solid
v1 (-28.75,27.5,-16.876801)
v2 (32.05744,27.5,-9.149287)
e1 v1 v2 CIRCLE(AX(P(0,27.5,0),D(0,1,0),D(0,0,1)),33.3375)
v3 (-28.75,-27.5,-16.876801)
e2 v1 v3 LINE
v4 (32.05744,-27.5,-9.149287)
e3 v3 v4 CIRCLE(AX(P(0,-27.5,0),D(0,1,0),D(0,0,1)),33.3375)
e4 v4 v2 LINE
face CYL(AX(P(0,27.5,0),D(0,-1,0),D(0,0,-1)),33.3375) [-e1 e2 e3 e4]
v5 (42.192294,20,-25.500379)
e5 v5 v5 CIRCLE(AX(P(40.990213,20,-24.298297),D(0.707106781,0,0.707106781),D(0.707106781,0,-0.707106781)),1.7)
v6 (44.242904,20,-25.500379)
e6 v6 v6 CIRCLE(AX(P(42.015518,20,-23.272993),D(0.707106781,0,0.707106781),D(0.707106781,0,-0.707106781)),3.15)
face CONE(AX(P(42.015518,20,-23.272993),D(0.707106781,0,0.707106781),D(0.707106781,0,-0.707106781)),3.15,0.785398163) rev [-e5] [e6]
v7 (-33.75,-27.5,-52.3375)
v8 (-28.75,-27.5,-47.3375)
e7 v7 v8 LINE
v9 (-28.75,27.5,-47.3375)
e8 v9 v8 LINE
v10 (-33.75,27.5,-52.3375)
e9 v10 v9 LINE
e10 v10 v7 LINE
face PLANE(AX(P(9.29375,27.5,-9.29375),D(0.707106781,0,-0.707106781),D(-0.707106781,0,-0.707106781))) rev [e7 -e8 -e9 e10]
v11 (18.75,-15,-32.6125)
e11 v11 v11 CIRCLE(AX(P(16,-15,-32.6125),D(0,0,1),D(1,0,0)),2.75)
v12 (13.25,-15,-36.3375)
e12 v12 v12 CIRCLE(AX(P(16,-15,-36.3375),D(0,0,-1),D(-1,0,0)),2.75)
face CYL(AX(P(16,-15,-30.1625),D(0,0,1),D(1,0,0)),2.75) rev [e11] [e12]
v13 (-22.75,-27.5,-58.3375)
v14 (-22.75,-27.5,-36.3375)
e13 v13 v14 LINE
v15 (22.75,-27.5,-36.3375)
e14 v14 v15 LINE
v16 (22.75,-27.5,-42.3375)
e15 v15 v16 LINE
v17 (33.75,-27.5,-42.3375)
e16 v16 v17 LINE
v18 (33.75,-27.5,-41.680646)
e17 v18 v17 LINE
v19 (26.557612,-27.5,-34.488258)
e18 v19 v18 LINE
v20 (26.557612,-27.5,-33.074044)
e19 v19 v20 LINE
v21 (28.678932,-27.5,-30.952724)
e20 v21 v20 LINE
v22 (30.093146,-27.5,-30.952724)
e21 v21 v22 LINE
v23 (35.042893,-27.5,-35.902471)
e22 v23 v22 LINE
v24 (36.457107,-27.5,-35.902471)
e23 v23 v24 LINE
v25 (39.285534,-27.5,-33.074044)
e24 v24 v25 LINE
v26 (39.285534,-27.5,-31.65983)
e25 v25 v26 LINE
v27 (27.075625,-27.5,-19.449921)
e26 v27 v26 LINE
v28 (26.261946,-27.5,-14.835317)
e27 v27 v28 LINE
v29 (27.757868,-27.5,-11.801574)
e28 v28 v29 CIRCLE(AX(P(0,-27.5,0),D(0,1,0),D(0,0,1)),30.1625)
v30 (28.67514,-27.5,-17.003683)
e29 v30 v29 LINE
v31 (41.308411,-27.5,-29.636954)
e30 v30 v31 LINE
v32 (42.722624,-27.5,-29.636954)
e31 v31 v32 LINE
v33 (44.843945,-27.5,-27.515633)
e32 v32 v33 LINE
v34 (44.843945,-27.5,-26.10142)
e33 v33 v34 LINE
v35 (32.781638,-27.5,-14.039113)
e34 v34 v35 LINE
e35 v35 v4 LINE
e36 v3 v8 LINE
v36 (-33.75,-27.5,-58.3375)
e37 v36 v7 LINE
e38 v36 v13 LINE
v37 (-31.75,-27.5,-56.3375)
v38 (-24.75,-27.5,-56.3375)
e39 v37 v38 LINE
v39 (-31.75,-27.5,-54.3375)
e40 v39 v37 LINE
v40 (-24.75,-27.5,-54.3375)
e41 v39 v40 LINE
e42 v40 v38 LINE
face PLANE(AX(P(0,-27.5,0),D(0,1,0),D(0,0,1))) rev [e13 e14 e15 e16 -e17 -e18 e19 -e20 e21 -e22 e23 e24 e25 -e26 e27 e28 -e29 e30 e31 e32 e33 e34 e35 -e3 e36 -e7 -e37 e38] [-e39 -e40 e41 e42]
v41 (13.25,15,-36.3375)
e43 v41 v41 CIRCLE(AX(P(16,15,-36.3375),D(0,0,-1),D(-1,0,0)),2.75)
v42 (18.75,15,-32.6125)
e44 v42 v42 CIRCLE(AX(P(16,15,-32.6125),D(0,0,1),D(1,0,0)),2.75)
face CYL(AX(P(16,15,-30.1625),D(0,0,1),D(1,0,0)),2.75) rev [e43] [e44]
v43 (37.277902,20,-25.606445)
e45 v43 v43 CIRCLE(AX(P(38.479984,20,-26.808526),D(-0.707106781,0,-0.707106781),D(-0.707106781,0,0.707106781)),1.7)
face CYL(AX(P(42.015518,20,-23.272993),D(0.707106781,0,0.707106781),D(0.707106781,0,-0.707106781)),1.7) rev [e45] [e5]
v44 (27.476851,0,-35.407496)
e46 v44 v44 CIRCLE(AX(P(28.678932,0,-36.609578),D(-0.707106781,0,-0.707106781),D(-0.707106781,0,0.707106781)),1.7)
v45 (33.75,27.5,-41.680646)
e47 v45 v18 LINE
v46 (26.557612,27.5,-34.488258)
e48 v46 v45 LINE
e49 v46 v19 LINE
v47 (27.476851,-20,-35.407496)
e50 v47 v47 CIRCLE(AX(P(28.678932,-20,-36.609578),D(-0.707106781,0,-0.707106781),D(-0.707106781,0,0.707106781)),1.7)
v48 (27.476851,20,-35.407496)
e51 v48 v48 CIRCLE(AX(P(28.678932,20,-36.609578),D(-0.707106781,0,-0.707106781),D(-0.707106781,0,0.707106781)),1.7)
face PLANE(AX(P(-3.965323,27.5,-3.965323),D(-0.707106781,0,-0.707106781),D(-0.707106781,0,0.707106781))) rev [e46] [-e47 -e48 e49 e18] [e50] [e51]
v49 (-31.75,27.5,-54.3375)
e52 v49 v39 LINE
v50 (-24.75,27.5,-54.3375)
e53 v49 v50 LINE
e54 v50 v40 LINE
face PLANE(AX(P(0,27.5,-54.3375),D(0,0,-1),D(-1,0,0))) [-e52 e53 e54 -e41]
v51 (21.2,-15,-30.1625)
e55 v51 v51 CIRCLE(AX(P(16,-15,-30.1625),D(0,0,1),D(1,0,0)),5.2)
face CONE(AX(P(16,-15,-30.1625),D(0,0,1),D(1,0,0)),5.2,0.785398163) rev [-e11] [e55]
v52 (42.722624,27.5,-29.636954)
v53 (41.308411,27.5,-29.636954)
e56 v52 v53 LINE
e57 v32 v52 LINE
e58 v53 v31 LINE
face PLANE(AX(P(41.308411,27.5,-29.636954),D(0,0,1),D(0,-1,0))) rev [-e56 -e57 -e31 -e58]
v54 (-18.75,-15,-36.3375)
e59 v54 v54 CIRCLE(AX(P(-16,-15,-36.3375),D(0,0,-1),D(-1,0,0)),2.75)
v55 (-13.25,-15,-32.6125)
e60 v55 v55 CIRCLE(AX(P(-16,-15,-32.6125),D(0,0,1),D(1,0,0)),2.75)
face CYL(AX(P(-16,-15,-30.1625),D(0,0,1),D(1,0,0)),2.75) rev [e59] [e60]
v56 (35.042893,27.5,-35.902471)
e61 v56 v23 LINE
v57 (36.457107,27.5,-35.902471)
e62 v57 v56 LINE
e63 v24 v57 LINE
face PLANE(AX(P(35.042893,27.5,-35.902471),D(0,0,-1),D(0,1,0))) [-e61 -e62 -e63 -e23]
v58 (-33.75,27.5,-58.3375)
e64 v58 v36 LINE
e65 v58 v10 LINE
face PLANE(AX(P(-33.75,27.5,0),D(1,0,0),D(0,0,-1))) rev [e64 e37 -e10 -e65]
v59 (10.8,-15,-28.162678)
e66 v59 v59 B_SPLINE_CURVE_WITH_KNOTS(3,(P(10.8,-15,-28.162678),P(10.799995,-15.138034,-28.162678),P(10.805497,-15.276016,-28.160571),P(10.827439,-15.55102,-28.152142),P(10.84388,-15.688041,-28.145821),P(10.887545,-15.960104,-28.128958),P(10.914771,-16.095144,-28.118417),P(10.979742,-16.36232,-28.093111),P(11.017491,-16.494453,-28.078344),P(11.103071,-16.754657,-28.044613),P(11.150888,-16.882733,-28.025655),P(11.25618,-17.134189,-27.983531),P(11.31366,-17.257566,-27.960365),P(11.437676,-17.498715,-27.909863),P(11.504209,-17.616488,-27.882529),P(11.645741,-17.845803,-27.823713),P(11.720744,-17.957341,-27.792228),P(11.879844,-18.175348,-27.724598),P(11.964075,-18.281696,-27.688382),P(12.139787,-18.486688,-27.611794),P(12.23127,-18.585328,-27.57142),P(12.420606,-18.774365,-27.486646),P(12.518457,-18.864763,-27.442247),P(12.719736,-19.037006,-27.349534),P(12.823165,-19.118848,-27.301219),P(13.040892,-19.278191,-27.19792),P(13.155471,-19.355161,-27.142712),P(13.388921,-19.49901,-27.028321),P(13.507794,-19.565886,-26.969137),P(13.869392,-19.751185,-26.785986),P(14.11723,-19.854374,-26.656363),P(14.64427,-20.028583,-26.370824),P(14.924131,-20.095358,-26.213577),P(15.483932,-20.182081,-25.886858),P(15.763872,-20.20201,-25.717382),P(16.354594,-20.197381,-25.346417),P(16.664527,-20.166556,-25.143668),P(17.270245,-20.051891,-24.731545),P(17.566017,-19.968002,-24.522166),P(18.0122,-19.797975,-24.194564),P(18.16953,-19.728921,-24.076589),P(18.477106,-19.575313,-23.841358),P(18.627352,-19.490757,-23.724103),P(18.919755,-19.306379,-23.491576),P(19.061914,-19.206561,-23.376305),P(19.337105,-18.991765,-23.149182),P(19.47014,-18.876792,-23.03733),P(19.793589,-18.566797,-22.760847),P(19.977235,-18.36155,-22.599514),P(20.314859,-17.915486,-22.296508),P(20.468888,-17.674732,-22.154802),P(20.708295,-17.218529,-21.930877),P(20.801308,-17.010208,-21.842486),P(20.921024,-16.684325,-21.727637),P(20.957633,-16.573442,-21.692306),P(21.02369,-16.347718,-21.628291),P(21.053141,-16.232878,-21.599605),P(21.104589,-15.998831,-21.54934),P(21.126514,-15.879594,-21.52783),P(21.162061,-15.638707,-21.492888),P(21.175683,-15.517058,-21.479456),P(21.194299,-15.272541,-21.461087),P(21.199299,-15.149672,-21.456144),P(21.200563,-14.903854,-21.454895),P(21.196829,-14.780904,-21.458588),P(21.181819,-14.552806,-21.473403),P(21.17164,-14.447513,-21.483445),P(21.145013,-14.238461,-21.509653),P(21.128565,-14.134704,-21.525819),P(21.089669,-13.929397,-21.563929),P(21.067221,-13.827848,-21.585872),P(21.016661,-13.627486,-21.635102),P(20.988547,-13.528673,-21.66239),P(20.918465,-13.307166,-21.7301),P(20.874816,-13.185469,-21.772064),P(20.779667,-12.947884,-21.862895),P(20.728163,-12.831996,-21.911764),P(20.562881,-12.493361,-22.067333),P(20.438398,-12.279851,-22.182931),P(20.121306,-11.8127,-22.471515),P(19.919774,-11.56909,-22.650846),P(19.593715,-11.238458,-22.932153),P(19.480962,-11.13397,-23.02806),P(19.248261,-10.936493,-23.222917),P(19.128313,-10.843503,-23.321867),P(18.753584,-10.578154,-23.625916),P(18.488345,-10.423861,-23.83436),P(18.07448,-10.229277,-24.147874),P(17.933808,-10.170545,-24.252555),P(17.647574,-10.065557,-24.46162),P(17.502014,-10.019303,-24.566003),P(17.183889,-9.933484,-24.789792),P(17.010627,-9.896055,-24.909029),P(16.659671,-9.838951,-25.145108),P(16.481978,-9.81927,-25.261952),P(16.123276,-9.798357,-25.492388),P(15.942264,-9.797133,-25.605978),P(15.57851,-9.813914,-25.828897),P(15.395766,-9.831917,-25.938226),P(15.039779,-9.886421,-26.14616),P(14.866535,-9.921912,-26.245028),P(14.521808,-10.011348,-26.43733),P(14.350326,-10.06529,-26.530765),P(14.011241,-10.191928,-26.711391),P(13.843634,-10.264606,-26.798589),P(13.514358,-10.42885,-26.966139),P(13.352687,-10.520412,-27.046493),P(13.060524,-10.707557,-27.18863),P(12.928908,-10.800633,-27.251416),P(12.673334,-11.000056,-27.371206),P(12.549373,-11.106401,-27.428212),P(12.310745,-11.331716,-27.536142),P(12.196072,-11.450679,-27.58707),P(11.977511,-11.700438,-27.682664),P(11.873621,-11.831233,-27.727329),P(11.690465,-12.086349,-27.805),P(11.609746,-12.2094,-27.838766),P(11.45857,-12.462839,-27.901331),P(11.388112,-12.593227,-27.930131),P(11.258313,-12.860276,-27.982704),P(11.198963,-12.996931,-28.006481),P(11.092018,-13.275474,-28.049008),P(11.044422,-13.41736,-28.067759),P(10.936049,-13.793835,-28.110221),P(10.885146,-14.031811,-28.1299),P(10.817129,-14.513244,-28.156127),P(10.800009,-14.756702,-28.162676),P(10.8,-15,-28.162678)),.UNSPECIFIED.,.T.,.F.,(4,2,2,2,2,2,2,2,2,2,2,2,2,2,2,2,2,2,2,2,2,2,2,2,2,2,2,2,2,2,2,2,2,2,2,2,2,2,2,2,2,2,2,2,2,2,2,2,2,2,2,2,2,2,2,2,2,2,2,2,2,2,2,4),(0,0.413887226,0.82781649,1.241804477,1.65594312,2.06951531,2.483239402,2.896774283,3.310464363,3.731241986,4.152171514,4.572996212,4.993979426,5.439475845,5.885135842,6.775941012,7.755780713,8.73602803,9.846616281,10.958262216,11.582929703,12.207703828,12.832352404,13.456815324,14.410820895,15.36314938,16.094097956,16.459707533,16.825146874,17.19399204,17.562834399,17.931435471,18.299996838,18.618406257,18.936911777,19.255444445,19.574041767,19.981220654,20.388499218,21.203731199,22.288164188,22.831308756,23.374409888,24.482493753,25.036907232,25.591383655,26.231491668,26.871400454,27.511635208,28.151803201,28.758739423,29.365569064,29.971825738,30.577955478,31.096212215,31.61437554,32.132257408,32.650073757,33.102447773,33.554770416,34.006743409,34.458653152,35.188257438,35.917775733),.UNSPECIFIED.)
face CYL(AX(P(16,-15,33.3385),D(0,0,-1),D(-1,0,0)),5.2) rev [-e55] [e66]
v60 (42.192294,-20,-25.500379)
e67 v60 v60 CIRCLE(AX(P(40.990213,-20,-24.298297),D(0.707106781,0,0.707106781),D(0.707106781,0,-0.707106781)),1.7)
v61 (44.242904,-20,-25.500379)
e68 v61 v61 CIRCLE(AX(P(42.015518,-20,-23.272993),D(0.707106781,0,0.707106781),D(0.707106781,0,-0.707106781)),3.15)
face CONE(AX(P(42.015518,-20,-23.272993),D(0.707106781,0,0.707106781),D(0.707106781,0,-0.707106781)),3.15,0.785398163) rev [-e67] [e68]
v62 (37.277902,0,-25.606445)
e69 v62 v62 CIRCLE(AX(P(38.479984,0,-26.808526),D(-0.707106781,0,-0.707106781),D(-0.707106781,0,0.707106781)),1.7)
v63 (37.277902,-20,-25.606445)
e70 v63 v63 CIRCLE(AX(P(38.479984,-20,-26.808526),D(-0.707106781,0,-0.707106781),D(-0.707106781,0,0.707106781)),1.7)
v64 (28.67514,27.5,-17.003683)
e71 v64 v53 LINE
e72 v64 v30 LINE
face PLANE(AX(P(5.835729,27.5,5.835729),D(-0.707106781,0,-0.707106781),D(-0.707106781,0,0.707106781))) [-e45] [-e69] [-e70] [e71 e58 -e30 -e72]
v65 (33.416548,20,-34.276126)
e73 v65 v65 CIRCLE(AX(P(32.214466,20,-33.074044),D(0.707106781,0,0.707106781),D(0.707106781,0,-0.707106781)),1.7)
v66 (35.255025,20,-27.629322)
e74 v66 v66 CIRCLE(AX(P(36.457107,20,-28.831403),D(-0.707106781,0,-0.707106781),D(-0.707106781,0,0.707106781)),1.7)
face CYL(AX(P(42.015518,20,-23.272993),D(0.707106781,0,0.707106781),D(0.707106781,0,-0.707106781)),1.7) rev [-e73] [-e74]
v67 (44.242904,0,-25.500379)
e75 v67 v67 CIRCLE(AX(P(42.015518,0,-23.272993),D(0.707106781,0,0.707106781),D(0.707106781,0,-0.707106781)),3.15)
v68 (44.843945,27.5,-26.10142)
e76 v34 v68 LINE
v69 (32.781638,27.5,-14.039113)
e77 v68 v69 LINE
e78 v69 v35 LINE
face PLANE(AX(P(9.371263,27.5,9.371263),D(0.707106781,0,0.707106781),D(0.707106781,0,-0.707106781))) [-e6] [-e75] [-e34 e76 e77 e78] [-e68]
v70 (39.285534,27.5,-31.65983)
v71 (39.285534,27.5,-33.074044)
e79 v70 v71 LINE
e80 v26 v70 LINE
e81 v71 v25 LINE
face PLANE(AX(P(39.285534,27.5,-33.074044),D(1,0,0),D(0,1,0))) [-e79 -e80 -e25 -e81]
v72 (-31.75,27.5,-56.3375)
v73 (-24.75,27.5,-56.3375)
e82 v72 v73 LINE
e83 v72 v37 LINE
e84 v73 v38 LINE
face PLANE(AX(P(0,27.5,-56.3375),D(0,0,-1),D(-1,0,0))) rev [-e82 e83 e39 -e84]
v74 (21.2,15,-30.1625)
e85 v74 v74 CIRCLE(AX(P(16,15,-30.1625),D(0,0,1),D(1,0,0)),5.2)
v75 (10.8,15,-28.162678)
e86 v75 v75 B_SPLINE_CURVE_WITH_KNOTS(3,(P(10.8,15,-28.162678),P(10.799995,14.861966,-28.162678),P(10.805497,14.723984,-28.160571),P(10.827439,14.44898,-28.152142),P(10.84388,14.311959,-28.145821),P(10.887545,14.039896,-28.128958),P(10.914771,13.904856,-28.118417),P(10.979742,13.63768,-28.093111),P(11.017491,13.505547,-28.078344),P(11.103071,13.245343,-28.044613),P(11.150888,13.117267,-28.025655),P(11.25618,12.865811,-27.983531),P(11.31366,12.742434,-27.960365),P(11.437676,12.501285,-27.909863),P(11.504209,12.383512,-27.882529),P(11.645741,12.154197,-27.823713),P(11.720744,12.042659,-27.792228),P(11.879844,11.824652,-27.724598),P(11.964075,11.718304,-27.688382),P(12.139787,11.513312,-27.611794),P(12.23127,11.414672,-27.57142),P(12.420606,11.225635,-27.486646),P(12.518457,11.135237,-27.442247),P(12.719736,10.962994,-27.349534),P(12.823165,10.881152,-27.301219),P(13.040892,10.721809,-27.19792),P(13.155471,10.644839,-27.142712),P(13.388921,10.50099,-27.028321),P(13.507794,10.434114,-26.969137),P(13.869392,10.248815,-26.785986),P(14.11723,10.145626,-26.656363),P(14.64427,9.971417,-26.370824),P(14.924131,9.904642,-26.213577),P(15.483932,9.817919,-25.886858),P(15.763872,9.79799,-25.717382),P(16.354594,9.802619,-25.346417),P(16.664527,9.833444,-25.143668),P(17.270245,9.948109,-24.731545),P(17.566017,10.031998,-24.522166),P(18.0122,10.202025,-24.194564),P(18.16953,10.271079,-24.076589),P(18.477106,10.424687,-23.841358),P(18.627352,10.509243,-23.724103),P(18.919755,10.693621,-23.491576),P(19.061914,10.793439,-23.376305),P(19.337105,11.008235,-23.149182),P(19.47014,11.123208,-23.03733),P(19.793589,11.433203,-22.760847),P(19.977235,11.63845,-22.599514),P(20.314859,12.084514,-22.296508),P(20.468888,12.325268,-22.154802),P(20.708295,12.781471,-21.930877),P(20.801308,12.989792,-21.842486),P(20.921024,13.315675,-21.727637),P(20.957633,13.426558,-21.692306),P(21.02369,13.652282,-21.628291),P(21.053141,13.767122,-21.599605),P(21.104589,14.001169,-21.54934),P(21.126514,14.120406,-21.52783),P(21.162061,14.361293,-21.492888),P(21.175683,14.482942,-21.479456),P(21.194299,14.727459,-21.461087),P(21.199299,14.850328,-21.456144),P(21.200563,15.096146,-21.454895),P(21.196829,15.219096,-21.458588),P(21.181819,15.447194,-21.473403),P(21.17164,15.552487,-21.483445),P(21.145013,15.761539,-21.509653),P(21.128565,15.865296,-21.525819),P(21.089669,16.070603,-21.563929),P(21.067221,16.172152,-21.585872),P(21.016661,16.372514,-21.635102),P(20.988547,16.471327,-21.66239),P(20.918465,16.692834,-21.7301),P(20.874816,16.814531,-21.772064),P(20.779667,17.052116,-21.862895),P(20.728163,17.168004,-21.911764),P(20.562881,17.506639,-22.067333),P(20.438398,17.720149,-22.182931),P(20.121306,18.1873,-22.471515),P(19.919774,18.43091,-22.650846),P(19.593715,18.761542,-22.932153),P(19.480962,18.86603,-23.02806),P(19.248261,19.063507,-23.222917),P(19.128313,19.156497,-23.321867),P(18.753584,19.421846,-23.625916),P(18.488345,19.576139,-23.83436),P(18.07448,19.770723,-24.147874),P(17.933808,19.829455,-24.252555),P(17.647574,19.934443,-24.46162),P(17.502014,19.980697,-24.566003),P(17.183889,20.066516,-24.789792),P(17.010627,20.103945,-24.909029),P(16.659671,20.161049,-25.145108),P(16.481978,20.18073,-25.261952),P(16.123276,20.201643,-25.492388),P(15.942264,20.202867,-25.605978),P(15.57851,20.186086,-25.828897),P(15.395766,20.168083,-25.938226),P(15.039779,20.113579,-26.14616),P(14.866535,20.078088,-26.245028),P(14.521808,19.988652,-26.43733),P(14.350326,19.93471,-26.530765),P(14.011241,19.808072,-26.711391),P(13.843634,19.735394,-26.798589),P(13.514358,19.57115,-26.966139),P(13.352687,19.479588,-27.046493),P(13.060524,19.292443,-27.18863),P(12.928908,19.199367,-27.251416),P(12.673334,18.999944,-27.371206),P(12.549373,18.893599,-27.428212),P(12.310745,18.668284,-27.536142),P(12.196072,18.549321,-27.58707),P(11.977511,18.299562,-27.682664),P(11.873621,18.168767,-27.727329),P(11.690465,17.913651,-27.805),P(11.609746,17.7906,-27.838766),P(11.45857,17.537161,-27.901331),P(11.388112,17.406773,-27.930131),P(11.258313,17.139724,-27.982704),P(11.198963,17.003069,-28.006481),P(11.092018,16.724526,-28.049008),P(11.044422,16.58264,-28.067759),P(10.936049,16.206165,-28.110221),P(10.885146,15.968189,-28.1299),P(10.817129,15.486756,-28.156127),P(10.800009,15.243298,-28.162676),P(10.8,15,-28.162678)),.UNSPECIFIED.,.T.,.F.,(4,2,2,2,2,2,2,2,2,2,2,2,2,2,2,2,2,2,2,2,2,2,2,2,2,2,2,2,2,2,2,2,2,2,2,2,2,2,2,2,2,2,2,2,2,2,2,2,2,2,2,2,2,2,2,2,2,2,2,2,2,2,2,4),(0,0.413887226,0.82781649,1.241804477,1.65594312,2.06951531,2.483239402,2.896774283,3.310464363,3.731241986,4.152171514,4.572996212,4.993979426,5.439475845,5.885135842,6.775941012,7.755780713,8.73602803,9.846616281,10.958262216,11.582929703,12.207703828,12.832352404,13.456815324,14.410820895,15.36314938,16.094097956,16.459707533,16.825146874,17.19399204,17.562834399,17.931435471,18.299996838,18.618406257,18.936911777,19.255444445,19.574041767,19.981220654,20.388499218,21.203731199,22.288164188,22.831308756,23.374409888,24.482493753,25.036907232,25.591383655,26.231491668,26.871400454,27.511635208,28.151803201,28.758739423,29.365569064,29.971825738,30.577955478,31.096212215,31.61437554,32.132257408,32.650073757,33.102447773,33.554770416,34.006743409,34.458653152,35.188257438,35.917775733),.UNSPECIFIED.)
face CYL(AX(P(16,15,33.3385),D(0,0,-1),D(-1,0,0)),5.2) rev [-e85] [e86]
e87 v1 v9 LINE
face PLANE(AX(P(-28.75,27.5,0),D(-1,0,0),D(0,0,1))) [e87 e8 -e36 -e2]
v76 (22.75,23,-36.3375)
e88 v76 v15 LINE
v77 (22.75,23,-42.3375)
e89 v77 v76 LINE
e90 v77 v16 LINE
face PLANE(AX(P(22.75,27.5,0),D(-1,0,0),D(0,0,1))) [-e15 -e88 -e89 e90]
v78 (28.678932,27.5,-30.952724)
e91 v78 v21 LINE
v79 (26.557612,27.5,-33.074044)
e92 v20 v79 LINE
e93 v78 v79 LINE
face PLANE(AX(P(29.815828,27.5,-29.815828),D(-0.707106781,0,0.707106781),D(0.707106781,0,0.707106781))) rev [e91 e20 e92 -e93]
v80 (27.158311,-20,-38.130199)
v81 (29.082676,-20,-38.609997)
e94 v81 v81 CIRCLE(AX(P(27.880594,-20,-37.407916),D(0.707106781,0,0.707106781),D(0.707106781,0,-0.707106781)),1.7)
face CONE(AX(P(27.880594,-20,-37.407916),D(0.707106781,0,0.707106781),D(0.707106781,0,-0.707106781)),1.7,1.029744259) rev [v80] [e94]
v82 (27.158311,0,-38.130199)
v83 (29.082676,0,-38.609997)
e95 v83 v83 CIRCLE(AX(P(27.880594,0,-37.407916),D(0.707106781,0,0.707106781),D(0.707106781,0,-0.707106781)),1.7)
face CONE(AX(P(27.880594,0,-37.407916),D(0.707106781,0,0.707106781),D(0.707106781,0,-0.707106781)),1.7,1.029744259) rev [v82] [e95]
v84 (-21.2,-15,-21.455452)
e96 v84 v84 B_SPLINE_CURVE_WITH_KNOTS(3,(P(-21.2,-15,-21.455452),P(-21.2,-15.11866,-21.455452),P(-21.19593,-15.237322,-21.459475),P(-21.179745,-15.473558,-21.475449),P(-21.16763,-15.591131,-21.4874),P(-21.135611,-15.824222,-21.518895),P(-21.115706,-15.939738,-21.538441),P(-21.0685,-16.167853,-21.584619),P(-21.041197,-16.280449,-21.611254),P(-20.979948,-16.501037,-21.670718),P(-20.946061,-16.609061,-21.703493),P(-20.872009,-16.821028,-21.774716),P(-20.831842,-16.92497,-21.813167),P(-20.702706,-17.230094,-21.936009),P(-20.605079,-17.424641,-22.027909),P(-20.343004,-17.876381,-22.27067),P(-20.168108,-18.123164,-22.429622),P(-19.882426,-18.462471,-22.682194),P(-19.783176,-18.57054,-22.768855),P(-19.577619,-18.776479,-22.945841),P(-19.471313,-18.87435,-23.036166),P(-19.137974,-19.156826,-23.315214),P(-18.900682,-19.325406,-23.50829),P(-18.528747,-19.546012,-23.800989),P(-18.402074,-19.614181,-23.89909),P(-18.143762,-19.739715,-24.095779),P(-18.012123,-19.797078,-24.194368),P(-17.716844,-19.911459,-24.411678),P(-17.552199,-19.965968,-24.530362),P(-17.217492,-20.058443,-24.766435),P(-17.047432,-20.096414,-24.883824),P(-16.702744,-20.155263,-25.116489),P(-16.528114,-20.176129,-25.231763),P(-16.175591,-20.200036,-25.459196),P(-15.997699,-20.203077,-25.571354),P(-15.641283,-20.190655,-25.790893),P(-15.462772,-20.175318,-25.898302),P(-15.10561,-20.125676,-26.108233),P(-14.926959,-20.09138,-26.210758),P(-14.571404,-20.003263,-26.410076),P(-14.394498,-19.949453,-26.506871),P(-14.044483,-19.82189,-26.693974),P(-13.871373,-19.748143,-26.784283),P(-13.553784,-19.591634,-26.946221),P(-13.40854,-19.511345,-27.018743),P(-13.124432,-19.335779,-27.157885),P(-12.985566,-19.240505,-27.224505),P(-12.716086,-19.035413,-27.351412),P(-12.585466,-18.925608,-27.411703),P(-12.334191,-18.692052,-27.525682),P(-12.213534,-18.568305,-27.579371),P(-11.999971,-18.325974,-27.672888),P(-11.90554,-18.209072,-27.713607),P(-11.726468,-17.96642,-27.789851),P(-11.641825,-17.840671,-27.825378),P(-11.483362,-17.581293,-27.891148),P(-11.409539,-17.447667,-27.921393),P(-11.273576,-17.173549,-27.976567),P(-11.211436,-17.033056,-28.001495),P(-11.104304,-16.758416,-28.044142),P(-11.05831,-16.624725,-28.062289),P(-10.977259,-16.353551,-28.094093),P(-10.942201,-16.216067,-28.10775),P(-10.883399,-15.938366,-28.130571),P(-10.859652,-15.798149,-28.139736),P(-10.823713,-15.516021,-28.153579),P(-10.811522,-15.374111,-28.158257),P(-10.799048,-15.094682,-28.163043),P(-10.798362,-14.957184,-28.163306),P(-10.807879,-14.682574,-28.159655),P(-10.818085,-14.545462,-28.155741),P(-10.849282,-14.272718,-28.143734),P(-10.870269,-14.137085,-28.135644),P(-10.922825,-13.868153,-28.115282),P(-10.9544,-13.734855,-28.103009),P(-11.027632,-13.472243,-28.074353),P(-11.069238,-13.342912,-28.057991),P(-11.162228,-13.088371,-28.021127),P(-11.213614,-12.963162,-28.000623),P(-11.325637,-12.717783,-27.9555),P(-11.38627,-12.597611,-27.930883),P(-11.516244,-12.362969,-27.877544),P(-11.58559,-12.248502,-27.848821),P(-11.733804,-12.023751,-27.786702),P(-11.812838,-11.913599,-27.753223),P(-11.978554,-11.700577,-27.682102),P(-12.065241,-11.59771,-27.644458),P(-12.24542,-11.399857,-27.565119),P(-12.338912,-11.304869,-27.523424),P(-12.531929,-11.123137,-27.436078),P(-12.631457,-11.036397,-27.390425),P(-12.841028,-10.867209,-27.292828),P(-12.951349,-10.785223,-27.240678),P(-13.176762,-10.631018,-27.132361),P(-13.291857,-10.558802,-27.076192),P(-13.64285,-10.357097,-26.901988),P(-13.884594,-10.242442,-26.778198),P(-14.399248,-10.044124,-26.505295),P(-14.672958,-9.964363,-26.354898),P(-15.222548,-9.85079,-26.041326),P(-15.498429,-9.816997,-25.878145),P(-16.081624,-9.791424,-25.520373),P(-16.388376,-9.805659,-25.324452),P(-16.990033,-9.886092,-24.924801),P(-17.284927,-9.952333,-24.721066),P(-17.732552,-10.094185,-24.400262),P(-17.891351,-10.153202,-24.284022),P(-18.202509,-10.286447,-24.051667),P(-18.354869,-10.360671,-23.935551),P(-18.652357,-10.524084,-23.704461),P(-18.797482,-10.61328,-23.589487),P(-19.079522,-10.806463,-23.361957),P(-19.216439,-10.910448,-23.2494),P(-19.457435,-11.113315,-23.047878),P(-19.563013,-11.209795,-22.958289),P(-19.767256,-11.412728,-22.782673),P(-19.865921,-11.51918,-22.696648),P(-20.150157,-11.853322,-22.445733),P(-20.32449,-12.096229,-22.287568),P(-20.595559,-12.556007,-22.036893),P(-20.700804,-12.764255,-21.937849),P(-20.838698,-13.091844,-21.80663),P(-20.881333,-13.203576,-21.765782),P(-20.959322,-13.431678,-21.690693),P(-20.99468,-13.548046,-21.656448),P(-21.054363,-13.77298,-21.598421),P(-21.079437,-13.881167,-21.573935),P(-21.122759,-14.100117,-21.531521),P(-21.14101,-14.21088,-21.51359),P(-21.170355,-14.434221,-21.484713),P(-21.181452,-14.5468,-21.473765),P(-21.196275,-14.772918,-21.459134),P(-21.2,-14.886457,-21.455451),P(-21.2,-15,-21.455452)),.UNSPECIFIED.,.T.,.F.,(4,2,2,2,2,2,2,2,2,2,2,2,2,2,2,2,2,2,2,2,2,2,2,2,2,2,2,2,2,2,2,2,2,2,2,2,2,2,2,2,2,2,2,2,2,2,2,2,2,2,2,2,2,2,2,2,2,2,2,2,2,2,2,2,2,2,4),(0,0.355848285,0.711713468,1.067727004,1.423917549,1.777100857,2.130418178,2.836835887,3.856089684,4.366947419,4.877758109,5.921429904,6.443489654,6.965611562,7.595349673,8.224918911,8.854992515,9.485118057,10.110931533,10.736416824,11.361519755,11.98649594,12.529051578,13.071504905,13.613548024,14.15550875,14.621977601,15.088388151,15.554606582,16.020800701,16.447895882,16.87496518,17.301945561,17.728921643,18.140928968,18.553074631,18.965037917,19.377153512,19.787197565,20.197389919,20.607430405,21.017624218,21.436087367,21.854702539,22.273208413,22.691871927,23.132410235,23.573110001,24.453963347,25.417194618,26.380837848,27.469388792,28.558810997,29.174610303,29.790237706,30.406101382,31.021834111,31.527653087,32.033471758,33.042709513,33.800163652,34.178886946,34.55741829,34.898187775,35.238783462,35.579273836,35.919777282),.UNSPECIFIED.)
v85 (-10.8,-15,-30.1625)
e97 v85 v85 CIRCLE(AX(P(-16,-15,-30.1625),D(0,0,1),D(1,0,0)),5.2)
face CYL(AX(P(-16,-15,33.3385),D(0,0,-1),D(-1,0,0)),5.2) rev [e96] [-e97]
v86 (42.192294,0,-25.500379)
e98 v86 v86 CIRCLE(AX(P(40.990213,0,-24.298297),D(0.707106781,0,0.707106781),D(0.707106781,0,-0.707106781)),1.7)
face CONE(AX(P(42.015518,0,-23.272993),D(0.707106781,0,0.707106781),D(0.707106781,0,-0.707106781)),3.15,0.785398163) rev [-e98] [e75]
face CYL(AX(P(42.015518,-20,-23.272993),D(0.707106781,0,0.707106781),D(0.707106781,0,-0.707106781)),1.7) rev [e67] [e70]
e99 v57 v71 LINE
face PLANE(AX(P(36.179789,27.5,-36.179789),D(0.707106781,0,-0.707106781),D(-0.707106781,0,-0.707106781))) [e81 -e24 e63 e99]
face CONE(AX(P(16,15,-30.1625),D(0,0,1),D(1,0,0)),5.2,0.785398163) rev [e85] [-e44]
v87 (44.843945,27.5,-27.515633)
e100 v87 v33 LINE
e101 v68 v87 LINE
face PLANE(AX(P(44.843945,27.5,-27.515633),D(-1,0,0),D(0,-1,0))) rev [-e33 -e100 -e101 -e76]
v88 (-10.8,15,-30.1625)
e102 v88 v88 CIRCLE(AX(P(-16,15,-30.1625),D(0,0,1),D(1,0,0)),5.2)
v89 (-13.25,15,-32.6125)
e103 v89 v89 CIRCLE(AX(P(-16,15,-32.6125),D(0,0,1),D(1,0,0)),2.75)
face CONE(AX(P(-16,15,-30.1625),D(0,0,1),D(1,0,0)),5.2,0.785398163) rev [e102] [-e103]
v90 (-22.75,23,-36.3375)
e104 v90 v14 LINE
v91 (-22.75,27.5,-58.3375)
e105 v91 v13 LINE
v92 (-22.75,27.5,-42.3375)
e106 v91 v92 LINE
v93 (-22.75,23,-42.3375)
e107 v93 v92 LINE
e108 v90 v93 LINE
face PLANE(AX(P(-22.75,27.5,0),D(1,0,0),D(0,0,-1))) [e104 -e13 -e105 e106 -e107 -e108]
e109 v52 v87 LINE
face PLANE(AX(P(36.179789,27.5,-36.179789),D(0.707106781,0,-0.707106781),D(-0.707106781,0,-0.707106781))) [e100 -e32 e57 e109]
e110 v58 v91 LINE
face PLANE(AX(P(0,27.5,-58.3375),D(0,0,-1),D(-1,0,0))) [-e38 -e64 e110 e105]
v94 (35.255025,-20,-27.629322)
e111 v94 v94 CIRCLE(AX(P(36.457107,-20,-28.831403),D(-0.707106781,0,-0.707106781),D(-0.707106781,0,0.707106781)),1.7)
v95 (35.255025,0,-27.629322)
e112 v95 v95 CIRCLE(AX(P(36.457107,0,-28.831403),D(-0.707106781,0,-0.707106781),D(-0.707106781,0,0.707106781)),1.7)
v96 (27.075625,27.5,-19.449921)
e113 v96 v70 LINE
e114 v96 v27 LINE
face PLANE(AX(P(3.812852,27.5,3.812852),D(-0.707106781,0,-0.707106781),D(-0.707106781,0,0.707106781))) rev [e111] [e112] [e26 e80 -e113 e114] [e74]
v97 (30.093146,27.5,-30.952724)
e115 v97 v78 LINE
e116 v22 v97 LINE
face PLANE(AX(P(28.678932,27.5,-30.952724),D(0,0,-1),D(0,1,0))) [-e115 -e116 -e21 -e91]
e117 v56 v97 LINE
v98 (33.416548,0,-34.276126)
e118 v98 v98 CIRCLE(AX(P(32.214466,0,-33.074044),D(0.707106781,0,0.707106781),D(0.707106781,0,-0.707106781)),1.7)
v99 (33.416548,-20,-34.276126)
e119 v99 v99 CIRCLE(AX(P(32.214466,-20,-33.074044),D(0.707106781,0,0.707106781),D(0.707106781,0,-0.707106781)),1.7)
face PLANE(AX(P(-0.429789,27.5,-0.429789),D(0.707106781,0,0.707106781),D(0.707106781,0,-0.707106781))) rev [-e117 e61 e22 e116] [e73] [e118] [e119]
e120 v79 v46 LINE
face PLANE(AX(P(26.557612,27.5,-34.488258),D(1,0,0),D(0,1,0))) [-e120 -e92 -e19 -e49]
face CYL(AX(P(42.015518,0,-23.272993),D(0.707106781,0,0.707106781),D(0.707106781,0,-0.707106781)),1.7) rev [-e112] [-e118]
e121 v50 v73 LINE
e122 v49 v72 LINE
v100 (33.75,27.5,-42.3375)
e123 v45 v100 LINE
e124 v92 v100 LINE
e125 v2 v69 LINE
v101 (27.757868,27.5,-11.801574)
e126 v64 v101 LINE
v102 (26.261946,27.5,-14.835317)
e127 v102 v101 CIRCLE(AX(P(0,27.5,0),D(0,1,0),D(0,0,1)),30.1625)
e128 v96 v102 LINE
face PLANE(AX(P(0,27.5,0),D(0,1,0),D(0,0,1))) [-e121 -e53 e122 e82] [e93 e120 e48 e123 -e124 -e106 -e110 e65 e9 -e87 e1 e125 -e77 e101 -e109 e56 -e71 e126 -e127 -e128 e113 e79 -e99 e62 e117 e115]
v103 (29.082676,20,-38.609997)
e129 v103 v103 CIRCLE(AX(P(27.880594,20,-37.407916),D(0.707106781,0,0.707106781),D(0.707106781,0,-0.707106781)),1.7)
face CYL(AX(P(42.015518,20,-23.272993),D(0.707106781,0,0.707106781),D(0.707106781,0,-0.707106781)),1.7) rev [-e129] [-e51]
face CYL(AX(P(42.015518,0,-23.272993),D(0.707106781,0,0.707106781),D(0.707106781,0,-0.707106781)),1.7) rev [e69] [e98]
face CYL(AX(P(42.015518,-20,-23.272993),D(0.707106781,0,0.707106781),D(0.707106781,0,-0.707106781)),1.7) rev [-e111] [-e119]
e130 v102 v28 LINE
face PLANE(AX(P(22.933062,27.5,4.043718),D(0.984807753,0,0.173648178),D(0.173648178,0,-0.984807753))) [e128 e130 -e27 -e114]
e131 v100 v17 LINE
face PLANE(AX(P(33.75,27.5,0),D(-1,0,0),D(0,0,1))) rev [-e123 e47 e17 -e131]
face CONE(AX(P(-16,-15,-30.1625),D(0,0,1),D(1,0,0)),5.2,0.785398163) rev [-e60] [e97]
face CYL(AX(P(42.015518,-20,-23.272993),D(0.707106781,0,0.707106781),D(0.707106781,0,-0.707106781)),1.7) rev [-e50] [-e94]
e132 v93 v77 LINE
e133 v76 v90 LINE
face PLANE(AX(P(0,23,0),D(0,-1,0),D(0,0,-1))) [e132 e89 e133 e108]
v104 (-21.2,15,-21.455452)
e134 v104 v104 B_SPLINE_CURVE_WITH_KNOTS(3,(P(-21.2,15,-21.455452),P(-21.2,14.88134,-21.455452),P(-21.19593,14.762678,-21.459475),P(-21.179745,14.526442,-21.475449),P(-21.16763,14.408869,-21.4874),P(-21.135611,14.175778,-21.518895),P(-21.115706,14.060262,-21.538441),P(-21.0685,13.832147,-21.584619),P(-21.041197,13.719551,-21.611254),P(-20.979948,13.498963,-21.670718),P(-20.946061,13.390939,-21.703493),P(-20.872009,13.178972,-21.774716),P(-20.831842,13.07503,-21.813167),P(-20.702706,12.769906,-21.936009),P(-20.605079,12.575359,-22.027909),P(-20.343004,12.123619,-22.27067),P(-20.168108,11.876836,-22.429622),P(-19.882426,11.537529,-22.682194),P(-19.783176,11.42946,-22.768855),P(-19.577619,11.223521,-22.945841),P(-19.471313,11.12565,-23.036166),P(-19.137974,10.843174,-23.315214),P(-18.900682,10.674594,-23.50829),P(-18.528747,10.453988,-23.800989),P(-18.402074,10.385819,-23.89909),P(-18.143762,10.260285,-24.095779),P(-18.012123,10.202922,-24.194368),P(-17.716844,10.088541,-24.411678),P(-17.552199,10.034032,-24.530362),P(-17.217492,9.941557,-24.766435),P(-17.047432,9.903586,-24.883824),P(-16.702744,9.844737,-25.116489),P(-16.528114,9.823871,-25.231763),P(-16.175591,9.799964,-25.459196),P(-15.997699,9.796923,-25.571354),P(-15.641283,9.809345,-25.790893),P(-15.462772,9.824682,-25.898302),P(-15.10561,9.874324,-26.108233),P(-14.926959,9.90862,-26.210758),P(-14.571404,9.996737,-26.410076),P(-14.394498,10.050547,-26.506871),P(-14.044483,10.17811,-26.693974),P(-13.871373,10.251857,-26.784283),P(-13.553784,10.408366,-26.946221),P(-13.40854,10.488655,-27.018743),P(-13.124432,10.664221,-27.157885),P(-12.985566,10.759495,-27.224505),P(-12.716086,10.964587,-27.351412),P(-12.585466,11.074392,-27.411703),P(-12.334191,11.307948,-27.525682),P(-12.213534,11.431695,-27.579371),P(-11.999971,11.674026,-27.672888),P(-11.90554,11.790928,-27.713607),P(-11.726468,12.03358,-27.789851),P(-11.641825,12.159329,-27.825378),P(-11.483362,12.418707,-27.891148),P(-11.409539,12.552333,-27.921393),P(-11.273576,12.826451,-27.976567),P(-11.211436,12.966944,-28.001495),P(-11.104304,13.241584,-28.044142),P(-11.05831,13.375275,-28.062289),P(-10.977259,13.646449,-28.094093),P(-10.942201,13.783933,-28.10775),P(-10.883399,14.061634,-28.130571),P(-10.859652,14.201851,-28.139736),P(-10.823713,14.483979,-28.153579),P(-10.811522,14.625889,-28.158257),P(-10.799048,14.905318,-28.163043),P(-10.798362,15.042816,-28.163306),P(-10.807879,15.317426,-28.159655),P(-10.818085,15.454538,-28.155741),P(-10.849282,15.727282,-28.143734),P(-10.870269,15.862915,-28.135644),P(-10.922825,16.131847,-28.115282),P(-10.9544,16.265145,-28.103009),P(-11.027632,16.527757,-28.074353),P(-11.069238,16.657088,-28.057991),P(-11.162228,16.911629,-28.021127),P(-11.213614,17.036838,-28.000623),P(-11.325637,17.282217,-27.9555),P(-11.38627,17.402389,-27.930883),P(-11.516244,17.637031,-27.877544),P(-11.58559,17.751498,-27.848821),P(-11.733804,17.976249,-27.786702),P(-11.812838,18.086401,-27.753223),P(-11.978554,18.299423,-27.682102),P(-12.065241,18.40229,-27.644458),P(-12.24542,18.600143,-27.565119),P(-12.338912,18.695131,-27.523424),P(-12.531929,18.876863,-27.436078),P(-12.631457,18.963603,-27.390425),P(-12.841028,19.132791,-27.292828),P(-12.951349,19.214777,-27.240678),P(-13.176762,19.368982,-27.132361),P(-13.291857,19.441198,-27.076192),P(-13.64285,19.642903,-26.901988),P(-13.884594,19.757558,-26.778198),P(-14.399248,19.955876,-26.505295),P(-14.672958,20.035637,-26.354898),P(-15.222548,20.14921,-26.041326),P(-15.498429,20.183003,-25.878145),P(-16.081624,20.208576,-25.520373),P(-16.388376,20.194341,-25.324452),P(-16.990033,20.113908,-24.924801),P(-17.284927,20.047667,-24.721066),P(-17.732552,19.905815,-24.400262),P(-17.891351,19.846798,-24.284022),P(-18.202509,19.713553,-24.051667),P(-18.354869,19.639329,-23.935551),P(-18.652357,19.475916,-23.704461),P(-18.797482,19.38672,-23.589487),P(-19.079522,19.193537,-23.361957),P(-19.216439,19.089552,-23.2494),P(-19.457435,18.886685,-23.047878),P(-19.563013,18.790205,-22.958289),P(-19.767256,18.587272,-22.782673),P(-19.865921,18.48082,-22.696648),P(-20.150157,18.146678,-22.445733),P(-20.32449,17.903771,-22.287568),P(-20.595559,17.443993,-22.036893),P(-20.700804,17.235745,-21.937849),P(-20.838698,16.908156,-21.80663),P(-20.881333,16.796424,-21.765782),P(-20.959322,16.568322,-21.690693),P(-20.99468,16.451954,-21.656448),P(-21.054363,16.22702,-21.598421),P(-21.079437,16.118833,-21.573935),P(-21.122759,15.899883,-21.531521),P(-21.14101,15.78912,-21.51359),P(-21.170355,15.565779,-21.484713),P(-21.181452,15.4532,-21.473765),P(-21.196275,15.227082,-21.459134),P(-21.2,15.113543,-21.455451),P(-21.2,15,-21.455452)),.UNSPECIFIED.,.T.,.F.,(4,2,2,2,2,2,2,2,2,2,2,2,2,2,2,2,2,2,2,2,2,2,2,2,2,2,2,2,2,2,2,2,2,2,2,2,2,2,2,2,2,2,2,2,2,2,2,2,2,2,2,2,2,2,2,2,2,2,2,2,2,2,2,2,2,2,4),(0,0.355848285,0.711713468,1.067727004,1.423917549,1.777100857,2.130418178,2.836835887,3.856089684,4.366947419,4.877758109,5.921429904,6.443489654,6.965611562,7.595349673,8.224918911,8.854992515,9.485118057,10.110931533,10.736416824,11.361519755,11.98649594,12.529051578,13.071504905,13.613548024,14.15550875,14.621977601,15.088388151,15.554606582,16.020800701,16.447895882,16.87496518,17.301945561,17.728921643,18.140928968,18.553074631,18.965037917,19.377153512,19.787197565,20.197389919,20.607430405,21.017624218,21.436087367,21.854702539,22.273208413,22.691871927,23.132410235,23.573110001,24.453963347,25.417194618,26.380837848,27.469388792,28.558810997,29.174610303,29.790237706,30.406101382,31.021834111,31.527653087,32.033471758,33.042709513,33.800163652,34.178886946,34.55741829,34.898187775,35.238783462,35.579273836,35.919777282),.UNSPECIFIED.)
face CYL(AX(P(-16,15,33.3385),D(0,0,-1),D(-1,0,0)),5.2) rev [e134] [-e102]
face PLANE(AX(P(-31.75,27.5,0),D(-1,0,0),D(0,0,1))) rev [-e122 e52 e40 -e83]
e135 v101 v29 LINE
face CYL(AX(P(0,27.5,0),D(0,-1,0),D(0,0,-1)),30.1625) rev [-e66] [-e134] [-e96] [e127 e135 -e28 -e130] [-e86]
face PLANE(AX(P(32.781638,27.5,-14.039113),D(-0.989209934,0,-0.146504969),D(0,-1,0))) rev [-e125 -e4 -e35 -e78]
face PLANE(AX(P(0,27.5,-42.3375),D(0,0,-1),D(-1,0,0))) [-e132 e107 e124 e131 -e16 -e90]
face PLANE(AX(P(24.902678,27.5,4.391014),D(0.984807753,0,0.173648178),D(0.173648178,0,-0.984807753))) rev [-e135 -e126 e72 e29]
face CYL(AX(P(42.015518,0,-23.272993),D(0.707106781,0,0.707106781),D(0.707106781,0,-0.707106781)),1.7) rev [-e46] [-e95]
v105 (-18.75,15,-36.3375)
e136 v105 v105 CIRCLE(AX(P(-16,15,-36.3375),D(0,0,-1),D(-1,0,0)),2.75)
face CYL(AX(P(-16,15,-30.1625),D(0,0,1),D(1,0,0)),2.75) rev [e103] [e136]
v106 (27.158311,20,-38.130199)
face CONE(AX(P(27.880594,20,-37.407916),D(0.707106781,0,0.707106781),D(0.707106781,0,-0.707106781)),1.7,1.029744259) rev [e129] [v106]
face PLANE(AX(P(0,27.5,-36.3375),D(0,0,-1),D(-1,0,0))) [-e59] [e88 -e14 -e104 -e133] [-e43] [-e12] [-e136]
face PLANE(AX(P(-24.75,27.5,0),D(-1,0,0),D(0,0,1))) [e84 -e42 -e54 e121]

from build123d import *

# Parameters (mm, degrees)
SKETCH1_W                                       = 7
SKETCH1_H                                       = 2
BOSS_EXTRUDE1_DEPTH                             = 27.5
CSK_FOR_M3_FLAT_HEAD_MACHINE_SCREW1_D           = 3.4
CSK_FOR_M3_FLAT_HEAD_MACHINE_SCREW1_DEPTH       = 19.9898
CSK_FOR_M3_FLAT_HEAD_MACHINE_SCREW1_CSINK_D     = 6.3
CSK_FOR_M3_FLAT_HEAD_MACHINE_SCREW1_CSINK_ANGLE = 90
CSK_FOR_M3_FLAT_HEAD_MACHINE_SCREW1_TIP         = 1.021463052
SKETCH4_W                                       = 45.5
SKETCH4_H                                       = 6
BOSS_EXTRUDE2_DEPTH                             = 4.5
CSK_FOR_M5_FLAT_HEAD_MACHINE_SCREW1_AT_2_COUNT  = 2
CSK_FOR_M5_FLAT_HEAD_MACHINE_SCREW1_AT_2_PITCH  = 32
CSK_FOR_M5_FLAT_HEAD_MACHINE_SCREW1_AT_3_COUNT  = 2
CSK_FOR_M5_FLAT_HEAD_MACHINE_SCREW1_AT_3_PITCH  = 43.863424399
CSK_FOR_M5_FLAT_HEAD_MACHINE_SCREW1_AT_4_COUNT  = 2
CSK_FOR_M5_FLAT_HEAD_MACHINE_SCREW1_AT_4_PITCH  = 30
CUT_EXTRUDE1_REACH                              = 84.846
CUT_EXTRUDE1_END_RADIUS                         = 30.1625
SKETCH13_R                                      = 5.2
CHAMFER1_SIZE                                   = 1
CHAMFER2_SIZE                                   = 2.517275241


with BuildPart() as part:
    # Sketch1 → Boss-Extrude1 (new, symmetric)
    with BuildSketch(Plane(origin=(0, 0, 0), x_dir=(1, 0, 0), z_dir=(0, 1, 0))):
        with BuildLine():
            Line((-28.75, 16.87680083), (-28.75, 47.337500038))
            Line((-28.75, 47.337500038), (-33.75, 52.337500038))
            Line((-33.75, 52.337500038), (-33.75, 58.337500038))
            Line((-33.75, 58.337500038), (-22.75, 58.337500038))
            Line((-22.75, 58.337500038), (-22.75, 36.3375))
            Line((-22.75, 36.3375), (22.75, 36.3375))
            Line((22.75, 36.3375), (22.75, 42.3375))
            Line((22.75, 42.3375), (33.75, 42.3375))
            Line((33.75, 42.3375), (33.75, 41.680645751))
            Line((33.75, 41.680645751), (25.850505063, 33.781150814))
            Line((25.850505063, 33.781150814), (29.386038969, 30.245616908))
            Line((29.386038969, 30.245616908), (35.75, 36.609577939))
            Line((35.75, 36.609577939), (39.992640687, 32.366937252))
            Line((39.992640687, 32.366937252), (27.075624874, 19.449921438))
            Line((27.075624874, 19.449921438), (26.261945555, 14.835316711))
            ThreePointArc((26.261945555, 14.835316711), (-27.052466926, -13.339431752), (27.757868174, 11.801574499))
            Line((27.757868174, 11.801574499), (28.675140267, 17.00368304))
            Line((28.675140267, 17.00368304), (42.015517583, 30.344060356))
            Line((42.015517583, 30.344060356), (45.551051488, 26.80852645))
            Line((45.551051488, 26.80852645), (31.001655302, 12.259130263))
            ThreePointArc((31.001655302, 12.259130263), (-2.568697776, -33.238391928), (-28.75, 16.87680083))
        make_face()
        with Locations((-28.25, 55.337500038)):
            Rectangle(SKETCH1_W, SKETCH1_H, mode=Mode.SUBTRACT)
    extrude(amount=BOSS_EXTRUDE1_DEPTH, both=True)

    # CSK for M3 Flat Head Machine Screw1
    with Locations(Plane(origin=(9.371262519, 0, 9.371262519), x_dir=(0.7071067811865392, 0, -0.7071067811865558), z_dir=(0.7071067811865558, 0, 0.7071067811865392))):
        with Locations((46.165948244, 20), (46.165948244, 0), (46.165948244, -20)):
            CounterSinkHole(CSK_FOR_M3_FLAT_HEAD_MACHINE_SCREW1_D / 2, CSK_FOR_M3_FLAT_HEAD_MACHINE_SCREW1_CSINK_D / 2, depth=CSK_FOR_M3_FLAT_HEAD_MACHINE_SCREW1_DEPTH, counter_sink_angle=CSK_FOR_M3_FLAT_HEAD_MACHINE_SCREW1_CSINK_ANGLE)
            with Locations((0, 0, -(CSK_FOR_M3_FLAT_HEAD_MACHINE_SCREW1_DEPTH + CSK_FOR_M3_FLAT_HEAD_MACHINE_SCREW1_TIP / 2))):  # 118° drill point
                Cone(0, CSK_FOR_M3_FLAT_HEAD_MACHINE_SCREW1_D / 2, CSK_FOR_M3_FLAT_HEAD_MACHINE_SCREW1_TIP, mode=Mode.SUBTRACT)

    # Sketch4 → Boss-Extrude2 (add)
    with BuildSketch(Plane.XZ.offset(-27.5)):
        with Locations((0, -39.3375)):
            Rectangle(SKETCH4_W, SKETCH4_H)
    extrude(amount=BOSS_EXTRUDE2_DEPTH)

    # Sketch12 → CSK for M5 Flat Head Machine Screw1 (revolve, cut)
    with BuildSketch(Plane(origin=(-16, 15, -30.1625), x_dir=(0, -1, 0), z_dir=(1, 0, 0))):
        Polygon((0, 0), (0, 28.175000038), (2.75, 28.175000038), (2.75, 2.45), (5.2, 0), align=None)
    csk_for_m5_flat_head_machine_screw1 = revolve(axis=Axis((-16, 15, -23.8125), (0, 0, -1)), mode=Mode.SUBTRACT)

    # CSK for M5 Flat Head Machine Screw1 at 2: CSK for M5 Flat Head Machine Screw1 ×2
    with Locations(*[(i * CSK_FOR_M5_FLAT_HEAD_MACHINE_SCREW1_AT_2_PITCH, 0, 0) for i in range(1, CSK_FOR_M5_FLAT_HEAD_MACHINE_SCREW1_AT_2_COUNT)]):
        add(csk_for_m5_flat_head_machine_screw1, mode=Mode.SUBTRACT)

    # CSK for M5 Flat Head Machine Screw1 at 3: CSK for M5 Flat Head Machine Screw1 ×2
    with Locations(*[Vector(0.7295372041400853, -0.6839411288813297, 0) * (i * CSK_FOR_M5_FLAT_HEAD_MACHINE_SCREW1_AT_3_PITCH) for i in range(1, CSK_FOR_M5_FLAT_HEAD_MACHINE_SCREW1_AT_3_COUNT)]):
        add(csk_for_m5_flat_head_machine_screw1, mode=Mode.SUBTRACT)

    # CSK for M5 Flat Head Machine Screw1 at 4: CSK for M5 Flat Head Machine Screw1 ×2
    with Locations(*[(0, -i * CSK_FOR_M5_FLAT_HEAD_MACHINE_SCREW1_AT_4_PITCH, 0) for i in range(1, CSK_FOR_M5_FLAT_HEAD_MACHINE_SCREW1_AT_4_COUNT)]):
        add(csk_for_m5_flat_head_machine_screw1, mode=Mode.SUBTRACT)

    # Cut-Extrude1: up to this cylinder (the profile starts outside it)
    cut_extrude1_end = Plane(origin=(0, 0, 0), z_dir=(0, -1, 0)) * Cylinder(CUT_EXTRUDE1_END_RADIUS, 261.017, mode=Mode.PRIVATE)
    # Sketch13 → Cut-Extrude1 (cut, up to the surface)
    with BuildSketch(Plane.XY.offset(-30.1625), mode=Mode.PRIVATE) as cut_extrude1_sk1:
        with Locations(Location((-16, -15, 0), (0, 0, 180))):
            Circle(SKETCH13_R)
    cut_extrude1_tool1 = extrude(cut_extrude1_sk1.sketch, amount=CUT_EXTRUDE1_REACH, mode=Mode.PRIVATE) - cut_extrude1_end
    add(cut_extrude1_tool1.solids().sort_by_distance((-16, -15, -30.1625))[0], mode=Mode.SUBTRACT)
    # Sketch13 → Cut-Extrude1 (cut, up to the surface)
    with BuildSketch(Plane.XY.offset(-30.1625), mode=Mode.PRIVATE) as cut_extrude1_sk2:
        with Locations(Location((16, -15, 0), (0, 0, 180))):
            Circle(SKETCH13_R)
    cut_extrude1_tool2 = extrude(cut_extrude1_sk2.sketch, amount=CUT_EXTRUDE1_REACH, mode=Mode.PRIVATE) - cut_extrude1_end
    add(cut_extrude1_tool2.solids().sort_by_distance((16, -15, -30.1625))[0], mode=Mode.SUBTRACT)
    # Sketch13 → Cut-Extrude1 (cut, up to the surface)
    with BuildSketch(Plane.XY.offset(-30.1625), mode=Mode.PRIVATE) as cut_extrude1_sk3:
        with Locations(Location((16, 15, 0), (0, 0, 180))):
            Circle(SKETCH13_R)
    cut_extrude1_tool3 = extrude(cut_extrude1_sk3.sketch, amount=CUT_EXTRUDE1_REACH, mode=Mode.PRIVATE) - cut_extrude1_end
    add(cut_extrude1_tool3.solids().sort_by_distance((16, 15, -30.1625))[0], mode=Mode.SUBTRACT)
    # Sketch13 → Cut-Extrude1 (cut, up to the surface)
    with BuildSketch(Plane.XY.offset(-30.1625), mode=Mode.PRIVATE) as cut_extrude1_sk4:
        with Locations(Location((-16, 15, 0), (0, 0, 180))):
            Circle(SKETCH13_R)
    cut_extrude1_tool4 = extrude(cut_extrude1_sk4.sketch, amount=CUT_EXTRUDE1_REACH, mode=Mode.PRIVATE) - cut_extrude1_end
    add(cut_extrude1_tool4.solids().sort_by_distance((-16, 15, -30.1625))[0], mode=Mode.SUBTRACT)

    # Chamfer1
    chamfer1_edges = [part.edges().sort_by_distance(p)[0] for p in [
        (42.015517583, 0, -30.344060356),
        (45.551051488, 0, -26.80852645),
        (25.850505063, 0, -33.781150814),
        (29.386038969, 0, -30.245616908),
        (35.75, 0, -36.609577939),
        (39.992640687, 0, -32.366937252),
    ]]
    chamfer(chamfer1_edges, length=CHAMFER1_SIZE)

    # Chamfer2
    # the kernel refuses this chamfer: 3, 2.517275241 mm, written as the material it adds along each edge
    with BuildSketch(Plane(origin=(31.001655302, -27.5, -12.259130263), x_dir=(0.3214763469276341, 0, 0.9469176090695871), z_dir=(0, 1, 0))) as chamfer2_piece_1:
        with BuildLine():
            Line((3.284174846, 0), (-CHAMFER2_SIZE * 0.442253757678, CHAMFER2_SIZE * 0.896889967468))
            Line((-CHAMFER2_SIZE * 0.442253757678, CHAMFER2_SIZE * 0.896889967468), (0, 0))
            ThreePointArc((0, 0), (1.695572388, 0.040423367), (3.284174846, 0))
        make_face()
    extrude(amount=55)


solid = part.part
